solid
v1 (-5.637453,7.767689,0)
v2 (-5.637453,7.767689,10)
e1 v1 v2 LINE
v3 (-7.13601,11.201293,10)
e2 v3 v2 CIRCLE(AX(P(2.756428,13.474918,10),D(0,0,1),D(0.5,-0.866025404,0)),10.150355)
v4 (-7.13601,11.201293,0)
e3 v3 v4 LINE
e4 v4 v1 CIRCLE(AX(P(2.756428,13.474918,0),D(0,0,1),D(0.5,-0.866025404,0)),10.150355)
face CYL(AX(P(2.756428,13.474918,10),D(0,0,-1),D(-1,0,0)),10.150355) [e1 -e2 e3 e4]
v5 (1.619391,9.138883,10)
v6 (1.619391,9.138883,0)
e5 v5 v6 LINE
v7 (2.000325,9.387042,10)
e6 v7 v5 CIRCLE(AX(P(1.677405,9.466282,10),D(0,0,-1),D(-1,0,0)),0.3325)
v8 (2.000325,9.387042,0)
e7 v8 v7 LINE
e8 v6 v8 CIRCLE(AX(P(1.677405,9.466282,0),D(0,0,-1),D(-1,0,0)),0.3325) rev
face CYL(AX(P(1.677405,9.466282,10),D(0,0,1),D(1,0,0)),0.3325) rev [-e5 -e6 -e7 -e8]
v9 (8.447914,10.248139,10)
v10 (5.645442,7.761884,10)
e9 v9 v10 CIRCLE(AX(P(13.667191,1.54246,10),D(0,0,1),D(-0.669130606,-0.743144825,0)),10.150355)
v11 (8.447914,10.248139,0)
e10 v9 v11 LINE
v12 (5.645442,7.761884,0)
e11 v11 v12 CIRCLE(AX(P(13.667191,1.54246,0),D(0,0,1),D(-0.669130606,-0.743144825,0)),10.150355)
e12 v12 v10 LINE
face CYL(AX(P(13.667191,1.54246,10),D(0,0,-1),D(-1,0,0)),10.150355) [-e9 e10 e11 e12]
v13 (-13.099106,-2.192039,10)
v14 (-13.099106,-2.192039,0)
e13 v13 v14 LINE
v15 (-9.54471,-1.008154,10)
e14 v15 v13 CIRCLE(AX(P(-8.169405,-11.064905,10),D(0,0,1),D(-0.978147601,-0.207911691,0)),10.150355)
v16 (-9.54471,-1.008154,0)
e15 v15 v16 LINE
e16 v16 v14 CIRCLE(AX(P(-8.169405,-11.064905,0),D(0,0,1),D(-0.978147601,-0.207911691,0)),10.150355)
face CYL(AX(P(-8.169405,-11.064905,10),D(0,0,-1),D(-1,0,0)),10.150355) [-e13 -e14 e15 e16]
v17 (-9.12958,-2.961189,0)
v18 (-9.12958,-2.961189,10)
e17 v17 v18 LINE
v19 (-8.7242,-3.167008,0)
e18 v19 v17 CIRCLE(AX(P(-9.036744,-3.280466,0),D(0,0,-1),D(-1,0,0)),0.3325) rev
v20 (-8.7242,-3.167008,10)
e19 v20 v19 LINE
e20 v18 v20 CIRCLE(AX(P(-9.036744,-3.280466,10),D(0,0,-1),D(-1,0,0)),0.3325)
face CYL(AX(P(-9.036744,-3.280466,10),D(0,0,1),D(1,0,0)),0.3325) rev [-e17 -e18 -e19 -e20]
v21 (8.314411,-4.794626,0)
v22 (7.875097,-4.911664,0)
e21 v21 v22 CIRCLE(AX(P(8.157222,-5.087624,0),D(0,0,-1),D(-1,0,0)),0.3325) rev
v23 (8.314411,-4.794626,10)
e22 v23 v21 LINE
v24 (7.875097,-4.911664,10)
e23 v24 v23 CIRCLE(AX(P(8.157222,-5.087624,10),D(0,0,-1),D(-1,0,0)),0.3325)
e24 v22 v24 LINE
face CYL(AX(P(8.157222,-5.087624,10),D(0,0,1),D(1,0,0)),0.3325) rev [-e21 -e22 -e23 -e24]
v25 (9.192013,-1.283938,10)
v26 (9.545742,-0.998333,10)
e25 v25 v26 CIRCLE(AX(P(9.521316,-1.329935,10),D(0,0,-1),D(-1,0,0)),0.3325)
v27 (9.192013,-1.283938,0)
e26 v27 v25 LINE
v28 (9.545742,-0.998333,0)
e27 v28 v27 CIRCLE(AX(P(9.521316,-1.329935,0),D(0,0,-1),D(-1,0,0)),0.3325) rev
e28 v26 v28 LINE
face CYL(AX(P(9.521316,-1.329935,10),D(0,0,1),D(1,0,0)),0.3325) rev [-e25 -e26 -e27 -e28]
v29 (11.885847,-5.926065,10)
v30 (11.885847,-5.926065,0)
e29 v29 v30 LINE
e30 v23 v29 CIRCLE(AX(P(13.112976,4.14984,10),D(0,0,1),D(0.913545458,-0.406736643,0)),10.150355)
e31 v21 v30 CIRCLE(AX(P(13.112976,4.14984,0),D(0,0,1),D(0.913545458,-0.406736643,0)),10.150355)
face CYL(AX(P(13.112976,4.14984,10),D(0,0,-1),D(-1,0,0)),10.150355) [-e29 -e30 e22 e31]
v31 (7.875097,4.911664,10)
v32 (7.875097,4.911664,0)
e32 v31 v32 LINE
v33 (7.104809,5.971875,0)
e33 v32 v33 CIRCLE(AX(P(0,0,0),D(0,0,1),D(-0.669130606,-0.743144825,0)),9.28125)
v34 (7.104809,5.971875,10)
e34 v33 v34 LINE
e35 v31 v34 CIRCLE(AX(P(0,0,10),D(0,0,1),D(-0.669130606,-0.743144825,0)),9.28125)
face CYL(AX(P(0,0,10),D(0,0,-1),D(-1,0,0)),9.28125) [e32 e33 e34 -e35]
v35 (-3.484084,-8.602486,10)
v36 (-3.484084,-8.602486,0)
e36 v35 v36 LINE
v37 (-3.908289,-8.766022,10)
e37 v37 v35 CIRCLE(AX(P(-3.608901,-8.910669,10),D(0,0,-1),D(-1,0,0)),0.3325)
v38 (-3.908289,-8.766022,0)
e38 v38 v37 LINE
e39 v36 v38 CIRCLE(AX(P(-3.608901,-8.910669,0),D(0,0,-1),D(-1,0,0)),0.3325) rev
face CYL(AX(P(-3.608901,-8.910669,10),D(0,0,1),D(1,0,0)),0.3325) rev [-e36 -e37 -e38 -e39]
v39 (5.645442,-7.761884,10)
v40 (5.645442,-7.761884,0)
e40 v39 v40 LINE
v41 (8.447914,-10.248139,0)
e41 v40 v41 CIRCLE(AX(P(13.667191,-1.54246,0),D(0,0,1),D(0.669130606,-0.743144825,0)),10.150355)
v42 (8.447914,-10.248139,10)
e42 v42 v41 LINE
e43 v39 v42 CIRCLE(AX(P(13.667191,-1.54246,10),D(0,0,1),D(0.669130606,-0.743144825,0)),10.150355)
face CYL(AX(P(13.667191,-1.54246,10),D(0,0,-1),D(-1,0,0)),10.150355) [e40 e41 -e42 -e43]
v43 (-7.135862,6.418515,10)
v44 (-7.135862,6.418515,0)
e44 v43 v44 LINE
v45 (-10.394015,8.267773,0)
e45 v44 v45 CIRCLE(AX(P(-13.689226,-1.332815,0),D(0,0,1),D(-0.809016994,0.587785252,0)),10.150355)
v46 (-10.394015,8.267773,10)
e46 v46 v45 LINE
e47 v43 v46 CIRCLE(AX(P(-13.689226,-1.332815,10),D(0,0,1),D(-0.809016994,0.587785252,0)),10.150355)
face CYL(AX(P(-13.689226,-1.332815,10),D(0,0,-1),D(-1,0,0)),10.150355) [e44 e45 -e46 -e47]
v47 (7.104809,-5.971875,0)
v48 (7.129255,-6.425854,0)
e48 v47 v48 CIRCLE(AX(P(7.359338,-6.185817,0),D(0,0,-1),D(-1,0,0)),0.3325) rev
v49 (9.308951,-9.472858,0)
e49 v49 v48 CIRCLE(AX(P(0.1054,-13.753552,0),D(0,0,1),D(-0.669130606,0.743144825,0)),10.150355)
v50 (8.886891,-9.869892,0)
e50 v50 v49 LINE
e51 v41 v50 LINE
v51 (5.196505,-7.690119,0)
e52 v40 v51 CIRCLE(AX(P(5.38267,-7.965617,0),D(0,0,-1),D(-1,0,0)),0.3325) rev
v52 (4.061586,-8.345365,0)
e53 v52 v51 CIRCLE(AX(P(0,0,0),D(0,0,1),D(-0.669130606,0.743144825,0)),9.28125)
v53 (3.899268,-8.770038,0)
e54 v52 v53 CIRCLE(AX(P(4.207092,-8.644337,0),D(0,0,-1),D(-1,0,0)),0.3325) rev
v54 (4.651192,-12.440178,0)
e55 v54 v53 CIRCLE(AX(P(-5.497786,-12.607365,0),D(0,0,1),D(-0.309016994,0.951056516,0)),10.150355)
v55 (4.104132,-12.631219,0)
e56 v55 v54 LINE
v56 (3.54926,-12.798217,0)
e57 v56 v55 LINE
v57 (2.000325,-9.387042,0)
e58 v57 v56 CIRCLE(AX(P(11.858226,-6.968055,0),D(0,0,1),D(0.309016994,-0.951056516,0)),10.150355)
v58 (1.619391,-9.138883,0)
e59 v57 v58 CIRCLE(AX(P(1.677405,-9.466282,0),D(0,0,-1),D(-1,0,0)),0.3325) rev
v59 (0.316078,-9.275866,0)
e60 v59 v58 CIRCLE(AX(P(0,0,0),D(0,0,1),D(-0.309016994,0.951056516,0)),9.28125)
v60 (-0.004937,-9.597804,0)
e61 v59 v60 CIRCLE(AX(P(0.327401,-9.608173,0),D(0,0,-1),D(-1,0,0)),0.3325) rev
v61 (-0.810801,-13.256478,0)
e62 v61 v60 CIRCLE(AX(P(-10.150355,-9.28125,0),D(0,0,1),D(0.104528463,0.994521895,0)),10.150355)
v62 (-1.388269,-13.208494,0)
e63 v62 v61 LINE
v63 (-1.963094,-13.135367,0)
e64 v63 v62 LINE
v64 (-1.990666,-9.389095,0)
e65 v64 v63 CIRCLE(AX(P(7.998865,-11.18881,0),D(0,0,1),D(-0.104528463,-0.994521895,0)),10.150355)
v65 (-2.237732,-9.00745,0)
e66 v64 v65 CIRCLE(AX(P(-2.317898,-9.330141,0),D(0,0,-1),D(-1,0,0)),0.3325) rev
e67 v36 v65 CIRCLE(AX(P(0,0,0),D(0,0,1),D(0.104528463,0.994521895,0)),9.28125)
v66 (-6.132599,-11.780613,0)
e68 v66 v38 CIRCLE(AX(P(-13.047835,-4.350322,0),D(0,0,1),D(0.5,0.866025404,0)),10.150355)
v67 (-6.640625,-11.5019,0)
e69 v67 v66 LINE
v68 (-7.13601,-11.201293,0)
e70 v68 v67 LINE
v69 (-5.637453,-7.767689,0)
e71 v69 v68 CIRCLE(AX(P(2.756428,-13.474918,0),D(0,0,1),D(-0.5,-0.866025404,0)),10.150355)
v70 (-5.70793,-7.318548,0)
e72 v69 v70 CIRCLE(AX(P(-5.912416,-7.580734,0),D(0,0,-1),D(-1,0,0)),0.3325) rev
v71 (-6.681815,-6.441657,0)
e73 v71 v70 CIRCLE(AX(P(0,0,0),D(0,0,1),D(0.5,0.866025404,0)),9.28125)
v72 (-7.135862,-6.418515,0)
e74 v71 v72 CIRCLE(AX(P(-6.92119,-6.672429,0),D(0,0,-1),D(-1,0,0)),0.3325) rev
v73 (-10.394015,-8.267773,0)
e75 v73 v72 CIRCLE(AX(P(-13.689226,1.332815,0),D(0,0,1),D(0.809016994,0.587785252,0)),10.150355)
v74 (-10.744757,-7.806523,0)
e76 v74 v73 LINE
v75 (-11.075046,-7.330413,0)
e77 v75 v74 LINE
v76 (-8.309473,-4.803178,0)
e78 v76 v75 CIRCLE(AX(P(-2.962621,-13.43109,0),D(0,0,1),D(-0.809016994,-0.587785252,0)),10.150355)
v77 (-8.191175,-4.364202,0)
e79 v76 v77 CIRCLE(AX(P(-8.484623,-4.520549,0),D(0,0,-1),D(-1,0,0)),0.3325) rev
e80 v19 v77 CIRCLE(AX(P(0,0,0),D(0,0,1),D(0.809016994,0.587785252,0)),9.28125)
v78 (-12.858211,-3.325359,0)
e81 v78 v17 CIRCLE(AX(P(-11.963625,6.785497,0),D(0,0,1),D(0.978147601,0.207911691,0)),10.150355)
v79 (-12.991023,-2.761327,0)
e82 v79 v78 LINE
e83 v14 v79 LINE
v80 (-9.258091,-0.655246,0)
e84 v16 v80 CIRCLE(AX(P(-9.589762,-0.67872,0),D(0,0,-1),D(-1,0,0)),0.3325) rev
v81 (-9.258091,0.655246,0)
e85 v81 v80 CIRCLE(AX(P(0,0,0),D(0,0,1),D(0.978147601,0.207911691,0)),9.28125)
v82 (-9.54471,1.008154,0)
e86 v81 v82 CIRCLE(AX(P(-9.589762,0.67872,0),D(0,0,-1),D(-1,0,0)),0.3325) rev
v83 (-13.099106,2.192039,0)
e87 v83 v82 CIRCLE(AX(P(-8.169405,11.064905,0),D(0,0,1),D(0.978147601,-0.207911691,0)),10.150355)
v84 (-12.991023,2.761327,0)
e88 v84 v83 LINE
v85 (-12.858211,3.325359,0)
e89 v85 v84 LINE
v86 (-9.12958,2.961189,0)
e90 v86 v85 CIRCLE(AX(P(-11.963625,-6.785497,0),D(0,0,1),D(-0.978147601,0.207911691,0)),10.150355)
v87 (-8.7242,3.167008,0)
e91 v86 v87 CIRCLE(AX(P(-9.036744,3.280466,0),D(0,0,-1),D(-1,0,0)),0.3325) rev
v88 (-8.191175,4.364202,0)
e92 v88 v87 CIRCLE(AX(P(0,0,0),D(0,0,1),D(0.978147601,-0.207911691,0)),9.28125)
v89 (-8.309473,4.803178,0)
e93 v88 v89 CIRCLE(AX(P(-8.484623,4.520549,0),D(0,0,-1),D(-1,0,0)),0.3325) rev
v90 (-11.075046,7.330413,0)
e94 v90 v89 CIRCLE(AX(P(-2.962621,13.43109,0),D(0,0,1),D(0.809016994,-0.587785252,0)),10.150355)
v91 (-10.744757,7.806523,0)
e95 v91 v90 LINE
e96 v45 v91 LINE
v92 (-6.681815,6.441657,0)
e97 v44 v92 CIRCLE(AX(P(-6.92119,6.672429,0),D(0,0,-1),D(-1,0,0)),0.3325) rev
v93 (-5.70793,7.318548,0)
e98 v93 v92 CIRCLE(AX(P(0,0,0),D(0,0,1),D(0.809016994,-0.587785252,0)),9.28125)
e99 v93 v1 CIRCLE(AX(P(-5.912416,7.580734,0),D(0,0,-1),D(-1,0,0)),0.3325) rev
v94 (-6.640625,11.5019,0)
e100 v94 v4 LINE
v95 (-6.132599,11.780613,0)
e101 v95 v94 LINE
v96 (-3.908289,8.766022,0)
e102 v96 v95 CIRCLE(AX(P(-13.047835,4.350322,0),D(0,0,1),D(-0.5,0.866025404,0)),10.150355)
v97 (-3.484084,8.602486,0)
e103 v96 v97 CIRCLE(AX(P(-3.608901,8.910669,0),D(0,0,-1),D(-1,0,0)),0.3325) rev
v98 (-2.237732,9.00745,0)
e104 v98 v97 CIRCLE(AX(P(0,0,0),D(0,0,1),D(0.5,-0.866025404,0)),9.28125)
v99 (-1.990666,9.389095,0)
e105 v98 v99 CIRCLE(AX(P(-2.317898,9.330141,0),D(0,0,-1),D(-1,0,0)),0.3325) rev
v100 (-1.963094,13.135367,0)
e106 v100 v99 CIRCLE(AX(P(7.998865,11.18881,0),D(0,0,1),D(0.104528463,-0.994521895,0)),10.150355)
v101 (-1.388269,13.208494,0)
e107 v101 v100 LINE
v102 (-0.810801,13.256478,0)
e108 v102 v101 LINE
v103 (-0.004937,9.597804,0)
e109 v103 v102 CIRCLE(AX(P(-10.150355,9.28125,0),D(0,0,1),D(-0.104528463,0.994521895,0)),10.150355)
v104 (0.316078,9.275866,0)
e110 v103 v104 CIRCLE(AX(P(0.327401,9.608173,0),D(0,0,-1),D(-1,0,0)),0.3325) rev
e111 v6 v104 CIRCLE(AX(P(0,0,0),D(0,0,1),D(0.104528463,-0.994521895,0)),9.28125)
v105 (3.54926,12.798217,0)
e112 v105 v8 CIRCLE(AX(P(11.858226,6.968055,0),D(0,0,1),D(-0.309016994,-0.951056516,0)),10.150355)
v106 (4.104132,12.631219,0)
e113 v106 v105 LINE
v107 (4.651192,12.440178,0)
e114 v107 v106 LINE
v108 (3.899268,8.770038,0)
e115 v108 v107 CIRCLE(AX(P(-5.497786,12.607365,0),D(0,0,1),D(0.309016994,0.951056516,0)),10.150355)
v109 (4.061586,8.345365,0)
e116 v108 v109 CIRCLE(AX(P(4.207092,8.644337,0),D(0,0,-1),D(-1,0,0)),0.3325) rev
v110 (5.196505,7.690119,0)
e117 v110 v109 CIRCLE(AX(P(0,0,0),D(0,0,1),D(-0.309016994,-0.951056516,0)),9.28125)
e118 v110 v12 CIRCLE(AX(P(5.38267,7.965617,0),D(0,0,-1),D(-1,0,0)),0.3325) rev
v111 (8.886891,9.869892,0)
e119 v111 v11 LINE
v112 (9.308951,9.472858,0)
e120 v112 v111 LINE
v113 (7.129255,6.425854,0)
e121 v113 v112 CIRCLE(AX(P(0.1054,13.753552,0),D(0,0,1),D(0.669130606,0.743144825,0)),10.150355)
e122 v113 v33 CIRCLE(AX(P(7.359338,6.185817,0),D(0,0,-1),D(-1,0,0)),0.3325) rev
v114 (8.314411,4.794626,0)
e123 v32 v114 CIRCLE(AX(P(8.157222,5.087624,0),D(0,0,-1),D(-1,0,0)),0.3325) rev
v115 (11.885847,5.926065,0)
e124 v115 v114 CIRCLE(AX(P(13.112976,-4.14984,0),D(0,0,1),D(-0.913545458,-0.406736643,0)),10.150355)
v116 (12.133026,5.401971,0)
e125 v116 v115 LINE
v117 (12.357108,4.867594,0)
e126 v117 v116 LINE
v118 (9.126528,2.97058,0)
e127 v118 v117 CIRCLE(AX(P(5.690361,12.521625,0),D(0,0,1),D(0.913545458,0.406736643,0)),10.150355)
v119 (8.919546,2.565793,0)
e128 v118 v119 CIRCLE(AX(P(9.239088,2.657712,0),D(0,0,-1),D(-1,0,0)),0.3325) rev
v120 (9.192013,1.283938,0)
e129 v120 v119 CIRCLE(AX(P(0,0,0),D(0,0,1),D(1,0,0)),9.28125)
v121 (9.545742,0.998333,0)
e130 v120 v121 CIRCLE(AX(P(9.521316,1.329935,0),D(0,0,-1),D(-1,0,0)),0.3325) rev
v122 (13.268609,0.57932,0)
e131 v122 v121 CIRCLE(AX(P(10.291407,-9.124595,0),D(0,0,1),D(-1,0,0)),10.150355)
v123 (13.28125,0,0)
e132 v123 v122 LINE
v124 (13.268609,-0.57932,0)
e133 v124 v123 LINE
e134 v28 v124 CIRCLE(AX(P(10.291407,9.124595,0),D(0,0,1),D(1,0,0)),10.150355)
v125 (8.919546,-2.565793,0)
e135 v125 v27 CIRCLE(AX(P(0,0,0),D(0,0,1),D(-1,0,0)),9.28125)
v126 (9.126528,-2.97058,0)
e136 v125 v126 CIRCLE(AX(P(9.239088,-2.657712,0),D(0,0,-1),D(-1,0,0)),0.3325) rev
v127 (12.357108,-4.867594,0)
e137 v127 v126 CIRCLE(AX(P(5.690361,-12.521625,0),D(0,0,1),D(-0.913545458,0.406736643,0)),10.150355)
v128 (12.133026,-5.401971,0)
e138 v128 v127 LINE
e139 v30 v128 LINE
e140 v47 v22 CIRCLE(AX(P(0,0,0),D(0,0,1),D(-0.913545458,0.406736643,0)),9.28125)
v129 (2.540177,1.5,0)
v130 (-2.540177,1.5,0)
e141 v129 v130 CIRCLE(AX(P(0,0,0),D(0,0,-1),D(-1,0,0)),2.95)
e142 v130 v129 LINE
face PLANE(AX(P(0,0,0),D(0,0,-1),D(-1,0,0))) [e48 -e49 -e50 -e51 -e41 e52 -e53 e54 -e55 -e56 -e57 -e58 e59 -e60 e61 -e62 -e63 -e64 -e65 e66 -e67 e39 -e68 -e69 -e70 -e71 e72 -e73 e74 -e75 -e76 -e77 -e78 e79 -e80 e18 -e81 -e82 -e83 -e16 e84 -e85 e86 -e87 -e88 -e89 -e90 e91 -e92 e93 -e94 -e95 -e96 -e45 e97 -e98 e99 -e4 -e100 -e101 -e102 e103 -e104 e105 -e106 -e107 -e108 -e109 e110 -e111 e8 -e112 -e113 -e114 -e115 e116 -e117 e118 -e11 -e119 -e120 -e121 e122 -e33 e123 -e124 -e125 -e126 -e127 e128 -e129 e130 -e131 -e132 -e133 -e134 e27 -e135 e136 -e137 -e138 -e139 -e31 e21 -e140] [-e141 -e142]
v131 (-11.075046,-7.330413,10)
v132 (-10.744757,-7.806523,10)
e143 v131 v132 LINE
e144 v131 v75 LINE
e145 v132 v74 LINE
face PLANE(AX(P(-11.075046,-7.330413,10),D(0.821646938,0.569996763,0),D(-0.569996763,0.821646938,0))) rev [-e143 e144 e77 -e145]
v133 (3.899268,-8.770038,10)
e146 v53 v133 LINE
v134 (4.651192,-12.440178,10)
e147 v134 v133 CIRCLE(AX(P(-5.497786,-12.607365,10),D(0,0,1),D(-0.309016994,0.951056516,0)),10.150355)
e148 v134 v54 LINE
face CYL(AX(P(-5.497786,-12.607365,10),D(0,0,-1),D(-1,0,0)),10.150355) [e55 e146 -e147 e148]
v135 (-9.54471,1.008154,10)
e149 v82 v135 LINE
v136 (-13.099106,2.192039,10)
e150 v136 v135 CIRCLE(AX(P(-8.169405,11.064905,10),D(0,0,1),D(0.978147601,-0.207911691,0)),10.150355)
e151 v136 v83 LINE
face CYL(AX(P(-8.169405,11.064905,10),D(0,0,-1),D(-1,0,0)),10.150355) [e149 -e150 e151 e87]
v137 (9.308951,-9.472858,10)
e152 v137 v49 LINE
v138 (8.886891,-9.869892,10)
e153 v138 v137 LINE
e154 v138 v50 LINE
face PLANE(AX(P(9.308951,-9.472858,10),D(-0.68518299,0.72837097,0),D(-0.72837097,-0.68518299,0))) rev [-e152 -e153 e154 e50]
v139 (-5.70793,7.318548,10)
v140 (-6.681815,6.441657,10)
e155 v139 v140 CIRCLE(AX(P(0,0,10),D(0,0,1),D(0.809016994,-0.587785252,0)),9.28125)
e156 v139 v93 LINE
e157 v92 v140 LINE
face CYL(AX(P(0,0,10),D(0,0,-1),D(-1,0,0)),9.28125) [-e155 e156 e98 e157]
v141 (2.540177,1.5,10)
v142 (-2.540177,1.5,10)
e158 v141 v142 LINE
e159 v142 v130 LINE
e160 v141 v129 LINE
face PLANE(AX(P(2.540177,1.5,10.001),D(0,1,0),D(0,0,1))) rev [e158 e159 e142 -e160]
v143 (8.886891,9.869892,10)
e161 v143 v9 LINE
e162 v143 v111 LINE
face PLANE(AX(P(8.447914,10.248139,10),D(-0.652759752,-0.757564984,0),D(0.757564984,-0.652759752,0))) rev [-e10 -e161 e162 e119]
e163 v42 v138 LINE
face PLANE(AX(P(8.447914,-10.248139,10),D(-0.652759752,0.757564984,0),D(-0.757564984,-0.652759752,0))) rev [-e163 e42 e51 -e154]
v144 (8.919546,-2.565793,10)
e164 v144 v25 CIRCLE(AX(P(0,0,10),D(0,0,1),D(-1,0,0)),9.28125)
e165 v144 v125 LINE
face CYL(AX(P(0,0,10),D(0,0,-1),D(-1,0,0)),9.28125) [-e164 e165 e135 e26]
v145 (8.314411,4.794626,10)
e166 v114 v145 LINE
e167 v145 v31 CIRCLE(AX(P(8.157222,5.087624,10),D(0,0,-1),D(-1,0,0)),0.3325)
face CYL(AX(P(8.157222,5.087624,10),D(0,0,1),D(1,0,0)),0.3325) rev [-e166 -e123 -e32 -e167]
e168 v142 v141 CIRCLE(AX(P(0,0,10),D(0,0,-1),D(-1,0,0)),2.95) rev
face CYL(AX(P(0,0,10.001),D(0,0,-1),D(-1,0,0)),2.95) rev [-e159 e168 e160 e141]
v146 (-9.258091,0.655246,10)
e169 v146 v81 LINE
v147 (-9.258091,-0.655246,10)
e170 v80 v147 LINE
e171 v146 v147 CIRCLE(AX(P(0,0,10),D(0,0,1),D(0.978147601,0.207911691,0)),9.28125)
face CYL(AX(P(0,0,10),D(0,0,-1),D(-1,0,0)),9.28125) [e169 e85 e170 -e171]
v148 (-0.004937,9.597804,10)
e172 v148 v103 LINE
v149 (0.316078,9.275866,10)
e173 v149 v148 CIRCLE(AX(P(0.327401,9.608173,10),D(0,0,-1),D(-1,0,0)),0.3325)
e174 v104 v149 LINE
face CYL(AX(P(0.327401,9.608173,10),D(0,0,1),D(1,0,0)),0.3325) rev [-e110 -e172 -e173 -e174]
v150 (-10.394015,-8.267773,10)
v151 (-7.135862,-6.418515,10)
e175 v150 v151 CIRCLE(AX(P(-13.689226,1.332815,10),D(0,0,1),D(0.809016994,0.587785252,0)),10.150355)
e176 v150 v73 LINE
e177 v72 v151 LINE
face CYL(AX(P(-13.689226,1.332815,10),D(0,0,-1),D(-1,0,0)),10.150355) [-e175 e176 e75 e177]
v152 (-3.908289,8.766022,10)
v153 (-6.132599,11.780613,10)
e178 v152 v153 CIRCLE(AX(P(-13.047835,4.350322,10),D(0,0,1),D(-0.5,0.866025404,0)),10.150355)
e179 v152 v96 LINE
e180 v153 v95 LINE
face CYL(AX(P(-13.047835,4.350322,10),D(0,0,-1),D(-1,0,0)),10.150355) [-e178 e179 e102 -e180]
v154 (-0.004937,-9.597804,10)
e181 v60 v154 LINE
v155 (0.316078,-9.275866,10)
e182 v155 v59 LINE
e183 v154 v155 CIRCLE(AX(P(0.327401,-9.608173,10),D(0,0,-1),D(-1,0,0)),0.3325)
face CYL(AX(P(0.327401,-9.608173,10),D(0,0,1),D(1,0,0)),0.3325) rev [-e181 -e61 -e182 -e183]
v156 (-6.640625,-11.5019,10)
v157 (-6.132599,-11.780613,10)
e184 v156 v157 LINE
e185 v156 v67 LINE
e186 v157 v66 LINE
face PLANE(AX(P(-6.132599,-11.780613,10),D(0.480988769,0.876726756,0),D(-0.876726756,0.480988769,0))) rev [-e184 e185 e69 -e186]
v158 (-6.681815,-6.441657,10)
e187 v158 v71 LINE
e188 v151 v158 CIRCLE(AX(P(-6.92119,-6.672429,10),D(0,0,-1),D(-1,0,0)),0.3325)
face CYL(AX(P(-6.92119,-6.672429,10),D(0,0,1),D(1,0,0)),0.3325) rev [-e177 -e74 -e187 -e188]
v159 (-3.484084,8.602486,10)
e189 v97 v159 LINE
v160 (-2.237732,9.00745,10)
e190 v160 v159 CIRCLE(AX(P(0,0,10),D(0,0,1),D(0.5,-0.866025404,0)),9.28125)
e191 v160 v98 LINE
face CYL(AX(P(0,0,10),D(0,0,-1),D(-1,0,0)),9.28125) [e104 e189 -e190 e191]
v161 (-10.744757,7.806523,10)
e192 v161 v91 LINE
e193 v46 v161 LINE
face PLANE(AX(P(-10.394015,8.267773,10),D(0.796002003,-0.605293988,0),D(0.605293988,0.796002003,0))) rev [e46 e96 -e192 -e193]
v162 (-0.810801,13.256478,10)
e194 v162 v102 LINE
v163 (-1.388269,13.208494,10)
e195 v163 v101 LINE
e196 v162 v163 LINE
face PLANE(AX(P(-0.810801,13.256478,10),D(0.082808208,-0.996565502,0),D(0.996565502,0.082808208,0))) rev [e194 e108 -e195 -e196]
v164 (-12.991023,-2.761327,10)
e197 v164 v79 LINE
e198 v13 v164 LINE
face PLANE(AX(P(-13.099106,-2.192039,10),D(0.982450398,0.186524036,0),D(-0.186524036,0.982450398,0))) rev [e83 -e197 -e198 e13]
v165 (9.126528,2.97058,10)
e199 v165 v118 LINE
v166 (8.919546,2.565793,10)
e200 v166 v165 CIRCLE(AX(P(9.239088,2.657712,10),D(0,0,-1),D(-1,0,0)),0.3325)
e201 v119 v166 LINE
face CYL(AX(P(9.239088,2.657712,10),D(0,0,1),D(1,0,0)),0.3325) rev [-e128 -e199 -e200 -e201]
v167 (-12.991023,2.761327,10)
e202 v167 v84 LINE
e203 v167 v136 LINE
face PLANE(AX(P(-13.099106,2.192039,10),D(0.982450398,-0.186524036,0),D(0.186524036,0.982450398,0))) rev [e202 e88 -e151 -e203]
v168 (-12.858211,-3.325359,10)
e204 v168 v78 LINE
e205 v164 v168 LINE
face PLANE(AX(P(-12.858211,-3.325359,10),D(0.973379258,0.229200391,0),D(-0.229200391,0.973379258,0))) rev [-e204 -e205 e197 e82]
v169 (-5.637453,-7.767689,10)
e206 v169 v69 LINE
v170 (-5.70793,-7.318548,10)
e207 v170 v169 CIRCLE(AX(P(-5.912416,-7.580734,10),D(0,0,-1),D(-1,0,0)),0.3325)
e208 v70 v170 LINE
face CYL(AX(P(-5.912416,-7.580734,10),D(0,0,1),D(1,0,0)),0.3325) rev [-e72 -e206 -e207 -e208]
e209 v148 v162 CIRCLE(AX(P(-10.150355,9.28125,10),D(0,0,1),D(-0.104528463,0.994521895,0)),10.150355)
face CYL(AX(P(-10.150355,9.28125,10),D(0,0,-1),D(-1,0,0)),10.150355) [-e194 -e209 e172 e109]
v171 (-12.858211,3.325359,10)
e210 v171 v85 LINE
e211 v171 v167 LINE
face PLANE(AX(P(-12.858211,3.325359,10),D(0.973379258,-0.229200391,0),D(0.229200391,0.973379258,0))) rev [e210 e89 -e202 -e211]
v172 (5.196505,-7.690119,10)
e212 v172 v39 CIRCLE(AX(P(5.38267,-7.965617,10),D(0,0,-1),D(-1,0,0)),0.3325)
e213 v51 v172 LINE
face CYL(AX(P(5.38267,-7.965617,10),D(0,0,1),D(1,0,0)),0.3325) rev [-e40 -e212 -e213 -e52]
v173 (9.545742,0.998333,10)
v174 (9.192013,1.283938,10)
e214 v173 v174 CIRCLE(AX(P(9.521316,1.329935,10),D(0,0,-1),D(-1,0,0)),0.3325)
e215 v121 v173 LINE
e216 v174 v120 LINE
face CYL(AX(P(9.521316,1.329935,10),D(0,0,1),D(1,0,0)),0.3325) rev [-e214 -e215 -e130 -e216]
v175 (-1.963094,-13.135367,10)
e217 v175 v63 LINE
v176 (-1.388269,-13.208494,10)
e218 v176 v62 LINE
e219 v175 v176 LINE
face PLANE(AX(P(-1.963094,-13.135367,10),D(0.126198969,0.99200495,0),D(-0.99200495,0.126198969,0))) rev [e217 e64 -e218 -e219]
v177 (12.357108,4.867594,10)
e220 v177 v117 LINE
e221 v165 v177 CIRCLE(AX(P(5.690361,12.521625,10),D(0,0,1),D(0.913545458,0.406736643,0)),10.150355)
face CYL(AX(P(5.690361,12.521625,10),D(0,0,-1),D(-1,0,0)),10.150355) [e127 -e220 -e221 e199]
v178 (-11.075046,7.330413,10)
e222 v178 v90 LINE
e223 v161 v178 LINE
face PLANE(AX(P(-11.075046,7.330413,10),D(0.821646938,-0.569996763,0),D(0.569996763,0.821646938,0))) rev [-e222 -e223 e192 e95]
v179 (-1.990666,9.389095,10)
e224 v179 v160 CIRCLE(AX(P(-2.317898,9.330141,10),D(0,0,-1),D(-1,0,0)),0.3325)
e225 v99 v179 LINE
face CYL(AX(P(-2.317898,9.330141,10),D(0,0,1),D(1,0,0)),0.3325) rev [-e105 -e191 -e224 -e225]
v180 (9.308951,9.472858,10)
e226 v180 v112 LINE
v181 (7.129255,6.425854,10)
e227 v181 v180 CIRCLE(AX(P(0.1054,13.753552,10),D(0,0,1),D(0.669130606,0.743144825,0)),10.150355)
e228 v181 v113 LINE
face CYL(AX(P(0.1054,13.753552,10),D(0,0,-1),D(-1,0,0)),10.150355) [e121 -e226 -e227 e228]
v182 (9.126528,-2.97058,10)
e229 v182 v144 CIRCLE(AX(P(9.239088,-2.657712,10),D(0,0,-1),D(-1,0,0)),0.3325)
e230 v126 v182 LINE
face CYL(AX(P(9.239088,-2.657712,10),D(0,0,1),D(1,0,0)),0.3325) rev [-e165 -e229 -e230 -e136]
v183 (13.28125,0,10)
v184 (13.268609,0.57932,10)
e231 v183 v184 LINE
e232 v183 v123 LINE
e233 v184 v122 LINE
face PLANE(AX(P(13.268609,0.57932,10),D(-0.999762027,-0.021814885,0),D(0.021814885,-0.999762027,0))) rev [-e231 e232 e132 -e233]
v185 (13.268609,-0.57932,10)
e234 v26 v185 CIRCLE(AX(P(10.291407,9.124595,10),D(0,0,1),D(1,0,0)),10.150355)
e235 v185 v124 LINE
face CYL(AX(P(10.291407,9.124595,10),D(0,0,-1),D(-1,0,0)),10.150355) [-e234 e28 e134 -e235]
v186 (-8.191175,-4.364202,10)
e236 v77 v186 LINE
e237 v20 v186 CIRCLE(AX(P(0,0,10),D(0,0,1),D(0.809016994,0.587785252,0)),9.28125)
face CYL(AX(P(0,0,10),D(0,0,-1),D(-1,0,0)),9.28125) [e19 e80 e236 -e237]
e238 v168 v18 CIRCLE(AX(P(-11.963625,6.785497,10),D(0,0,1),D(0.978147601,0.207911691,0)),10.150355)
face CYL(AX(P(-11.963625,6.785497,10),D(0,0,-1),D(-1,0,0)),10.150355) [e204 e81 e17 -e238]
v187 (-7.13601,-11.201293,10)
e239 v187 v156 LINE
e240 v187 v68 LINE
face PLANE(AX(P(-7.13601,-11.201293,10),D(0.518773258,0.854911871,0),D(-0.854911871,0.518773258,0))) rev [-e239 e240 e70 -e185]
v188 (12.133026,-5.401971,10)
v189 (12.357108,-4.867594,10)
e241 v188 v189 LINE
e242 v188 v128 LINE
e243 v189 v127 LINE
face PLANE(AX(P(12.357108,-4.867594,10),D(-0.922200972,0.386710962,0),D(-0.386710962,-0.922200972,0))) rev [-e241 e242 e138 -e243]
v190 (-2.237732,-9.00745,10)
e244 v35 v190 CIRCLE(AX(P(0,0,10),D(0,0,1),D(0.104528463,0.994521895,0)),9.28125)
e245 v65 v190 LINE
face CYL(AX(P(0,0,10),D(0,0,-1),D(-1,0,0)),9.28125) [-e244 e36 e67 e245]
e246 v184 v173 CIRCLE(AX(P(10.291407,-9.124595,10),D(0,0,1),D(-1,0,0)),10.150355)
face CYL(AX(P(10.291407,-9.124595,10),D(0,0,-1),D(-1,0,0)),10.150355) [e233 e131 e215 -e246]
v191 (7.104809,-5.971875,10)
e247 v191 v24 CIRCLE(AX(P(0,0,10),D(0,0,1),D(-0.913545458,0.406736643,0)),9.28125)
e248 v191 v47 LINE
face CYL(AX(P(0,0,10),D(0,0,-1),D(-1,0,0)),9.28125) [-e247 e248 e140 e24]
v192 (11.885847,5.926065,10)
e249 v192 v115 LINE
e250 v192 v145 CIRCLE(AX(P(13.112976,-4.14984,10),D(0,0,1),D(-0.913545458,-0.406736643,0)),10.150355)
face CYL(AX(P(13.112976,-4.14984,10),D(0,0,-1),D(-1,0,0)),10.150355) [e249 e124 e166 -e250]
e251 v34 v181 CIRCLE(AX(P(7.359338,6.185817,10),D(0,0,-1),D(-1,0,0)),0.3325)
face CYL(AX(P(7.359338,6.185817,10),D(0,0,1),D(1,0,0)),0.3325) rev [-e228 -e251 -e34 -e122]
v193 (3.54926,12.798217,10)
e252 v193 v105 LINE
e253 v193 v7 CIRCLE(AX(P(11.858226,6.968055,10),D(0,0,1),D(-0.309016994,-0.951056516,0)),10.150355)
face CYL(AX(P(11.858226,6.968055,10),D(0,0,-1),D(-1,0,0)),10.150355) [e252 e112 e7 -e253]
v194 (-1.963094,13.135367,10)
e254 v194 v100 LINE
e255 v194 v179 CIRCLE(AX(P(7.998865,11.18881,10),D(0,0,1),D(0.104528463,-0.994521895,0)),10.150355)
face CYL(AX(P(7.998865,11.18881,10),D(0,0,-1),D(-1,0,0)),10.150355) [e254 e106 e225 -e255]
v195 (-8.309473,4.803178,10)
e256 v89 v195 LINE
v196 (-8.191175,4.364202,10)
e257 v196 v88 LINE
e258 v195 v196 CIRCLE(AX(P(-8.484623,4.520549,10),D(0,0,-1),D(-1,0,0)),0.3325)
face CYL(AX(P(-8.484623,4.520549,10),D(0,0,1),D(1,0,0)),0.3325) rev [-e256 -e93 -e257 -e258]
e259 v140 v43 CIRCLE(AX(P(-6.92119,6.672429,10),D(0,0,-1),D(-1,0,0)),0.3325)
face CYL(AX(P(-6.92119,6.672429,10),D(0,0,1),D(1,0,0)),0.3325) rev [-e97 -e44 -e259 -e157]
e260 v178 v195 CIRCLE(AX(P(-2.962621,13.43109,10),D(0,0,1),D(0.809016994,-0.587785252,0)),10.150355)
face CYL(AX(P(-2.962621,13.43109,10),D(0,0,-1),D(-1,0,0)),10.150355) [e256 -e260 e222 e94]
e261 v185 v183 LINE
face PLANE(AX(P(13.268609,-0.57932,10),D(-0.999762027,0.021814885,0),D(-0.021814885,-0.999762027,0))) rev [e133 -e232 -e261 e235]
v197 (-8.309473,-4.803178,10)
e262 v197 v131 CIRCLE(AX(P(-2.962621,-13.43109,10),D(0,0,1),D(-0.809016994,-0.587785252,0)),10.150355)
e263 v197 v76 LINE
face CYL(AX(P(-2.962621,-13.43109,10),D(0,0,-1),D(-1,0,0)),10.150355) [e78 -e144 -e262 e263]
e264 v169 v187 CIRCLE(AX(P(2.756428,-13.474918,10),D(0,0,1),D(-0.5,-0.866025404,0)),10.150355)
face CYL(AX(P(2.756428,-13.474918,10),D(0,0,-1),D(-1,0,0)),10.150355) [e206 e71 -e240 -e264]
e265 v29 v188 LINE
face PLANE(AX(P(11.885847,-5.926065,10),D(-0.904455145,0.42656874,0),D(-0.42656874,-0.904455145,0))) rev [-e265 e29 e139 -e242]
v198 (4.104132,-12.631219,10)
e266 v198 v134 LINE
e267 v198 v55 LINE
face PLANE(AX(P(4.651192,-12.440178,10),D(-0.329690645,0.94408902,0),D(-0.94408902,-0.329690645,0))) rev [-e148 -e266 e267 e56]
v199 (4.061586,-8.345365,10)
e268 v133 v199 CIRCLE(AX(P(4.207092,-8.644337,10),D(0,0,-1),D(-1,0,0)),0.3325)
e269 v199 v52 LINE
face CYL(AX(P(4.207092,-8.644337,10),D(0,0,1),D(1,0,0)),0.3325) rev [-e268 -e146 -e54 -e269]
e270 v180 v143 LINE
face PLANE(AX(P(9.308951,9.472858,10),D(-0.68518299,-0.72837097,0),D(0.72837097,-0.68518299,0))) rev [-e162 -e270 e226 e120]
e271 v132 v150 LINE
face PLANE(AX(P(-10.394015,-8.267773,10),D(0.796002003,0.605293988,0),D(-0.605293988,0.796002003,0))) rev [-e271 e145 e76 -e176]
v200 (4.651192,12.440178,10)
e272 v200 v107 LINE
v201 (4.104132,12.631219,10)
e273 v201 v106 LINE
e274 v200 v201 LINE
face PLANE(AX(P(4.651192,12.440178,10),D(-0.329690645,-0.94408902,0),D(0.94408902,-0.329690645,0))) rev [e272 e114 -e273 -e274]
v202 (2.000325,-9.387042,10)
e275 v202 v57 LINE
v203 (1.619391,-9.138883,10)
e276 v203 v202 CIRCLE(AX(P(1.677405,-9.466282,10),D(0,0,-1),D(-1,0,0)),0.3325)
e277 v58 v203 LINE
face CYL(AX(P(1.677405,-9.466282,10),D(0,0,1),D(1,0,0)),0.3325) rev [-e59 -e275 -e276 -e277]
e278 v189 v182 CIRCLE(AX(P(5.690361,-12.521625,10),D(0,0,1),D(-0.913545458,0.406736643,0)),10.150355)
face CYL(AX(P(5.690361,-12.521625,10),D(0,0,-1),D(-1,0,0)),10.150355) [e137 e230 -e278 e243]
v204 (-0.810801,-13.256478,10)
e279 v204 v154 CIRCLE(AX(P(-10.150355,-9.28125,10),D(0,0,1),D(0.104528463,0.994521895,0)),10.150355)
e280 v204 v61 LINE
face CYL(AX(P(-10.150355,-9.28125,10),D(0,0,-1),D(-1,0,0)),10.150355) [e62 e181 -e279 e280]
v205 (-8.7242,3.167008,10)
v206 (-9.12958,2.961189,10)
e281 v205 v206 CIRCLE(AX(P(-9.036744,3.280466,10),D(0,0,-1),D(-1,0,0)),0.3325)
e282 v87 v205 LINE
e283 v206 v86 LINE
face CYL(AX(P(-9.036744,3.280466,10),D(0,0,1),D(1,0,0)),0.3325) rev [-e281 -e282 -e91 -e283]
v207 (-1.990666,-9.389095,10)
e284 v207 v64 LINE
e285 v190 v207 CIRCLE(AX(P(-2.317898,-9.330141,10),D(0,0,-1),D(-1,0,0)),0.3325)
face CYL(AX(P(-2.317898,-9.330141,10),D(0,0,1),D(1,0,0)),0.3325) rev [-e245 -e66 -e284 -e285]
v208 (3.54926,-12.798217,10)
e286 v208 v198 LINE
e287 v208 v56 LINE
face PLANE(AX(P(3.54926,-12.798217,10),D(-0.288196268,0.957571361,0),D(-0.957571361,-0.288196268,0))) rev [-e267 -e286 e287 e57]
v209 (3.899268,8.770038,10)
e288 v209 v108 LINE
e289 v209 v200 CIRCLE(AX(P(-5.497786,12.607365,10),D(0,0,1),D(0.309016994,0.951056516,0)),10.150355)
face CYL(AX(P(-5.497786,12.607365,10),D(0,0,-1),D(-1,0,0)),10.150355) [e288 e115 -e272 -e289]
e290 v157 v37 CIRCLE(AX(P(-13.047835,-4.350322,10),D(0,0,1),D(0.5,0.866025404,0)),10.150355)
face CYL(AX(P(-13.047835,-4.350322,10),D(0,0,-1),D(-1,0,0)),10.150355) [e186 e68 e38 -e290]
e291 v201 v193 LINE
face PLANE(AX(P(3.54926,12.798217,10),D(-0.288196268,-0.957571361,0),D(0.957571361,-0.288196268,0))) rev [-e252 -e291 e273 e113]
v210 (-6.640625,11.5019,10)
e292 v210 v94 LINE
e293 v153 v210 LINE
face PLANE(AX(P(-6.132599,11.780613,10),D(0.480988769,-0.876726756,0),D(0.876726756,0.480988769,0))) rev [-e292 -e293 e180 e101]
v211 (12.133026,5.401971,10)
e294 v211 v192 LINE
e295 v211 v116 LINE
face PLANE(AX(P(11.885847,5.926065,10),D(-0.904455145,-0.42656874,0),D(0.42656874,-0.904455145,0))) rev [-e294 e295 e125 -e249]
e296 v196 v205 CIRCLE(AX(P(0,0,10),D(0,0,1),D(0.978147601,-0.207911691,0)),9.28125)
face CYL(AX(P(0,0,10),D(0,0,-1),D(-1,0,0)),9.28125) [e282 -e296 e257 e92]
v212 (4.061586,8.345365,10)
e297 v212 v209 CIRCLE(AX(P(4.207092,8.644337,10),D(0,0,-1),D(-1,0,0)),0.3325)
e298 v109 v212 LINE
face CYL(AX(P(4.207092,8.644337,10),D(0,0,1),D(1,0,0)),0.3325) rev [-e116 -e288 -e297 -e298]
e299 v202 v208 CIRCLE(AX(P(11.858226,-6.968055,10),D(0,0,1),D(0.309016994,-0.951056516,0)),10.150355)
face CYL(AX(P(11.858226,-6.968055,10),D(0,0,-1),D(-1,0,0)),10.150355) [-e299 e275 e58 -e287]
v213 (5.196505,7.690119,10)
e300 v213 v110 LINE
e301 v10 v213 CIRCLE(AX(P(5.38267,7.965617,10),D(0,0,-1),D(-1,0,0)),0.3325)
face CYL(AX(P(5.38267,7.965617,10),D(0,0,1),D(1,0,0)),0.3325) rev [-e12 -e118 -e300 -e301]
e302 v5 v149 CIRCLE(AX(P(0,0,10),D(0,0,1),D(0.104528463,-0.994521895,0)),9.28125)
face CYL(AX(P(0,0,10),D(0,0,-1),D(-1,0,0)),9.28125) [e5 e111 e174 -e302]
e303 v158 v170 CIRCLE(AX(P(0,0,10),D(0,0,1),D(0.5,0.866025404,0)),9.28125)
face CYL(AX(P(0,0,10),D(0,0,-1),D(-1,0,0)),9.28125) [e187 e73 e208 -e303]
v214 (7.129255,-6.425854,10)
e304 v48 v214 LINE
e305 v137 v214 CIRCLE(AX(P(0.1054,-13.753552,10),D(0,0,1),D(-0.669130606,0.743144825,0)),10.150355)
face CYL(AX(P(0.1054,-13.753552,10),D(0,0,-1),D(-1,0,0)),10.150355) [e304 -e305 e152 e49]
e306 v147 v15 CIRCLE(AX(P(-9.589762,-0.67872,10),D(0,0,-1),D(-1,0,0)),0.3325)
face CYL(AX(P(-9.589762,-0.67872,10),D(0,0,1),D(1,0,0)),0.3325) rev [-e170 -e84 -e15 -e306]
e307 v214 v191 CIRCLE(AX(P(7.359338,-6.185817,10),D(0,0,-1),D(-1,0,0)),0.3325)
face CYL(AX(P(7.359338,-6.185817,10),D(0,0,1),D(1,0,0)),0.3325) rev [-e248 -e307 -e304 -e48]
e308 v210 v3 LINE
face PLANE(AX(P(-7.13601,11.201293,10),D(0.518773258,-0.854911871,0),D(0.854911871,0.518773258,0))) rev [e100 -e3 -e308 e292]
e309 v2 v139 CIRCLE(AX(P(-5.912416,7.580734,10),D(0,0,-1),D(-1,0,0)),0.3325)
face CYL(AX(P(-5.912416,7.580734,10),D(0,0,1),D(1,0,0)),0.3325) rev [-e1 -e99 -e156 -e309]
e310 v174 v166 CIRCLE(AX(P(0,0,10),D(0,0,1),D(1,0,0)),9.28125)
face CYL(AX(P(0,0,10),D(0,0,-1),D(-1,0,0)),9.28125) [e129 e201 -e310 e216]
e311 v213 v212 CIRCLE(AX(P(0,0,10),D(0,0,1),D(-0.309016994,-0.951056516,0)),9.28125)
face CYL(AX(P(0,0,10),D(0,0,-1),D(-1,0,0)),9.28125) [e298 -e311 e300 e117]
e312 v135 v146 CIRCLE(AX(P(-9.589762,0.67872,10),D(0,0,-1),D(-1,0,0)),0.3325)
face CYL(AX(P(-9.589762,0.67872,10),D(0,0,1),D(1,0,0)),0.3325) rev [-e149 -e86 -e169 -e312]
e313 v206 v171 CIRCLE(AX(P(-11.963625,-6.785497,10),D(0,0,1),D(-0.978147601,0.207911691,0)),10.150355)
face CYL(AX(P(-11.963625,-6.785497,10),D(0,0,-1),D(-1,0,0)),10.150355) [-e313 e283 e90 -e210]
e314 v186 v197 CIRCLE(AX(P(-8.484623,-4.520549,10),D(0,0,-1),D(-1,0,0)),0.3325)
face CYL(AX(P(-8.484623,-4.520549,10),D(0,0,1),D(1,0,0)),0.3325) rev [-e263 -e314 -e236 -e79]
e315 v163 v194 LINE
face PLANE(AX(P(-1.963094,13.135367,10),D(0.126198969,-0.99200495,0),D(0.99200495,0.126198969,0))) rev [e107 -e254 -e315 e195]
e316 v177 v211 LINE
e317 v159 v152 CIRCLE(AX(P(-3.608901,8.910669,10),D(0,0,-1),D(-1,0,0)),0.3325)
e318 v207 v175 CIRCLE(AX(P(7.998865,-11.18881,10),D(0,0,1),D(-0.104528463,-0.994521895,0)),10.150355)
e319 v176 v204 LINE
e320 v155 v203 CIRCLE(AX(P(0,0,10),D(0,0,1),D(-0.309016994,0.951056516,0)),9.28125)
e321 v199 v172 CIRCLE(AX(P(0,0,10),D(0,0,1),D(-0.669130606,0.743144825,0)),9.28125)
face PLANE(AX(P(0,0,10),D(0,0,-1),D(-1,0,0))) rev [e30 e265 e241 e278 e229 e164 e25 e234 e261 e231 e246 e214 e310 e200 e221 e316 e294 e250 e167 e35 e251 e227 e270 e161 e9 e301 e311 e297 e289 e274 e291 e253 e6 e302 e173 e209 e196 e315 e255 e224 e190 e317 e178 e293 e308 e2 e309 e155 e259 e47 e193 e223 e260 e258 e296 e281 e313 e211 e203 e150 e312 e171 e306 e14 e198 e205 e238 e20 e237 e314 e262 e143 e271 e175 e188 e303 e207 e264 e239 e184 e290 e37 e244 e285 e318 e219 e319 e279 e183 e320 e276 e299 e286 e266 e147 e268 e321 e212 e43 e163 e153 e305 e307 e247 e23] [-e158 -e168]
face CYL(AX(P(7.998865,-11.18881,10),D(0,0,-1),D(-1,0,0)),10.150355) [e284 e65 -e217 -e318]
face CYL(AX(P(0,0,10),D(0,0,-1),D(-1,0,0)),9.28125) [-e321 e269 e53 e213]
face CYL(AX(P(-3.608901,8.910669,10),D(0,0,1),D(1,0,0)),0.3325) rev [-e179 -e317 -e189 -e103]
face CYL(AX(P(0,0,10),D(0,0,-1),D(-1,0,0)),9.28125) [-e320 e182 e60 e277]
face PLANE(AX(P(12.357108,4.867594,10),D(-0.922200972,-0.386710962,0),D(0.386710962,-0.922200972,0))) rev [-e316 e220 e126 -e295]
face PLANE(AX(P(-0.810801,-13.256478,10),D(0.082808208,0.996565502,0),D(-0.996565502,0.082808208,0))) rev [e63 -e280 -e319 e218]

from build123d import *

# Parameters (mm, degrees)
BOSS_EXTRUDE1_DEPTH      = 10
FILLET1_R                = 0.3325
CIRPATTERN1_COUNT        = 15
FILLET1_OF_CIRPATTERN1_R = 0.3325
CUT_EXTRUDE1_START       = -10
CUT_EXTRUDE1_DEPTH       = 10


# Read off the part's stored shape, not the designer's step: Cut-Extrude1
with BuildPart() as part:
    # Sketch1 → Boss-Extrude1 (new body)
    with BuildSketch(Plane.XY):
        with BuildLine():
            Line((13.268609193, 0.579319988), (13.28125, 0))
            Line((13.28125, 0), (13.268609193, -0.579319988))
            ThreePointArc((13.268609193, -0.579319988), (11.2692337, -0.978550661), (9.230406341, -0.9701548))
            ThreePointArc((9.230406341, -0.9701548), (9.166982411, -1.451907379), (9.078432419, -1.92968038))
            Line((9.078432419, -1.92968038), (0, 0))
            Line((0, 0), (9.078432419, 1.92968038))
            ThreePointArc((9.078432419, 1.92968038), (9.166982411, 1.451907379), (9.230406341, 0.9701548))
            ThreePointArc((9.230406341, 0.9701548), (11.2692337, 0.978550661), (13.268609193, 0.579319988))
        make_face()
    boss_extrude1 = extrude(amount=BOSS_EXTRUDE1_DEPTH)

    # Fillet1
    fillet1_edges = [part.edges().sort_by_distance(p)[0] for p in [
        (9.230406341, 0.9701548, 5),
        (9.230406341, -0.9701548, 5),
    ]]
    fillet(fillet1_edges, radius=FILLET1_R)

    # CirPattern1: Boss-Extrude1 ×15 about axis
    cirpattern1_axis = Axis((0, 0, 0), (0, 0, 1))
    for i in range(1, CIRPATTERN1_COUNT):
        add(boss_extrude1.rotate(cirpattern1_axis, i * 360 / CIRPATTERN1_COUNT))

    # Fillet1 of CirPattern1
    fillet1_of_cirpattern1_edges = [part.edges().sort_by_distance(p)[0] for p in [
        (8.037798279, 4.640625, 5),
        (8.826993292, 2.868063979, 5),
        (5.455381873, 7.508688979, 5),
        (6.897312911, 6.21036844, 5),
        (1.92968038, 9.078432419, 5),
        (3.775024469, 8.478843779, 5),
        (-1.92968038, 9.078432419, 5),
        (0, 9.28125, 5),
        (-5.455381873, 7.508688979, 5),
        (-3.775024469, 8.478843779, 5),
        (-8.037798279, 4.640625, 5),
        (-6.897312911, 6.21036844, 5),
        (-9.230406341, 0.9701548, 5),
        (-8.826993292, 2.868063979, 5),
        (-8.826993292, -2.868063979, 5),
        (-9.230406341, -0.9701548, 5),
        (-6.897312911, -6.21036844, 5),
        (-8.037798279, -4.640625, 5),
        (-3.775024469, -8.478843779, 5),
        (-5.455381873, -7.508688979, 5),
        (0, -9.28125, 5),
        (-1.92968038, -9.078432419, 5),
        (3.775024469, -8.478843779, 5),
        (1.92968038, -9.078432419, 5),
        (6.897312911, -6.21036844, 5),
        (5.455381873, -7.508688979, 5),
        (8.826993292, -2.868063979, 5),
        (8.037798279, -4.640625, 5),
    ]]
    fillet(fillet1_of_cirpattern1_edges, radius=FILLET1_OF_CIRPATTERN1_R)

    # Cut-Extrude1 outline → Cut-Extrude1 (cut)
    with BuildSketch(Plane(origin=(0, 0, 0), x_dir=(-1, 0, 0), z_dir=(0, 0, -1)).offset(CUT_EXTRUDE1_START)):
        with BuildLine():
            Line((2.540177159, 1.5), (-2.540177159, 1.5))
            ThreePointArc((-2.540177159, 1.5), (0, -2.95), (2.540177159, 1.5))
        make_face()
    extrude(amount=CUT_EXTRUDE1_DEPTH, mode=Mode.SUBTRACT)


solid = part.part
